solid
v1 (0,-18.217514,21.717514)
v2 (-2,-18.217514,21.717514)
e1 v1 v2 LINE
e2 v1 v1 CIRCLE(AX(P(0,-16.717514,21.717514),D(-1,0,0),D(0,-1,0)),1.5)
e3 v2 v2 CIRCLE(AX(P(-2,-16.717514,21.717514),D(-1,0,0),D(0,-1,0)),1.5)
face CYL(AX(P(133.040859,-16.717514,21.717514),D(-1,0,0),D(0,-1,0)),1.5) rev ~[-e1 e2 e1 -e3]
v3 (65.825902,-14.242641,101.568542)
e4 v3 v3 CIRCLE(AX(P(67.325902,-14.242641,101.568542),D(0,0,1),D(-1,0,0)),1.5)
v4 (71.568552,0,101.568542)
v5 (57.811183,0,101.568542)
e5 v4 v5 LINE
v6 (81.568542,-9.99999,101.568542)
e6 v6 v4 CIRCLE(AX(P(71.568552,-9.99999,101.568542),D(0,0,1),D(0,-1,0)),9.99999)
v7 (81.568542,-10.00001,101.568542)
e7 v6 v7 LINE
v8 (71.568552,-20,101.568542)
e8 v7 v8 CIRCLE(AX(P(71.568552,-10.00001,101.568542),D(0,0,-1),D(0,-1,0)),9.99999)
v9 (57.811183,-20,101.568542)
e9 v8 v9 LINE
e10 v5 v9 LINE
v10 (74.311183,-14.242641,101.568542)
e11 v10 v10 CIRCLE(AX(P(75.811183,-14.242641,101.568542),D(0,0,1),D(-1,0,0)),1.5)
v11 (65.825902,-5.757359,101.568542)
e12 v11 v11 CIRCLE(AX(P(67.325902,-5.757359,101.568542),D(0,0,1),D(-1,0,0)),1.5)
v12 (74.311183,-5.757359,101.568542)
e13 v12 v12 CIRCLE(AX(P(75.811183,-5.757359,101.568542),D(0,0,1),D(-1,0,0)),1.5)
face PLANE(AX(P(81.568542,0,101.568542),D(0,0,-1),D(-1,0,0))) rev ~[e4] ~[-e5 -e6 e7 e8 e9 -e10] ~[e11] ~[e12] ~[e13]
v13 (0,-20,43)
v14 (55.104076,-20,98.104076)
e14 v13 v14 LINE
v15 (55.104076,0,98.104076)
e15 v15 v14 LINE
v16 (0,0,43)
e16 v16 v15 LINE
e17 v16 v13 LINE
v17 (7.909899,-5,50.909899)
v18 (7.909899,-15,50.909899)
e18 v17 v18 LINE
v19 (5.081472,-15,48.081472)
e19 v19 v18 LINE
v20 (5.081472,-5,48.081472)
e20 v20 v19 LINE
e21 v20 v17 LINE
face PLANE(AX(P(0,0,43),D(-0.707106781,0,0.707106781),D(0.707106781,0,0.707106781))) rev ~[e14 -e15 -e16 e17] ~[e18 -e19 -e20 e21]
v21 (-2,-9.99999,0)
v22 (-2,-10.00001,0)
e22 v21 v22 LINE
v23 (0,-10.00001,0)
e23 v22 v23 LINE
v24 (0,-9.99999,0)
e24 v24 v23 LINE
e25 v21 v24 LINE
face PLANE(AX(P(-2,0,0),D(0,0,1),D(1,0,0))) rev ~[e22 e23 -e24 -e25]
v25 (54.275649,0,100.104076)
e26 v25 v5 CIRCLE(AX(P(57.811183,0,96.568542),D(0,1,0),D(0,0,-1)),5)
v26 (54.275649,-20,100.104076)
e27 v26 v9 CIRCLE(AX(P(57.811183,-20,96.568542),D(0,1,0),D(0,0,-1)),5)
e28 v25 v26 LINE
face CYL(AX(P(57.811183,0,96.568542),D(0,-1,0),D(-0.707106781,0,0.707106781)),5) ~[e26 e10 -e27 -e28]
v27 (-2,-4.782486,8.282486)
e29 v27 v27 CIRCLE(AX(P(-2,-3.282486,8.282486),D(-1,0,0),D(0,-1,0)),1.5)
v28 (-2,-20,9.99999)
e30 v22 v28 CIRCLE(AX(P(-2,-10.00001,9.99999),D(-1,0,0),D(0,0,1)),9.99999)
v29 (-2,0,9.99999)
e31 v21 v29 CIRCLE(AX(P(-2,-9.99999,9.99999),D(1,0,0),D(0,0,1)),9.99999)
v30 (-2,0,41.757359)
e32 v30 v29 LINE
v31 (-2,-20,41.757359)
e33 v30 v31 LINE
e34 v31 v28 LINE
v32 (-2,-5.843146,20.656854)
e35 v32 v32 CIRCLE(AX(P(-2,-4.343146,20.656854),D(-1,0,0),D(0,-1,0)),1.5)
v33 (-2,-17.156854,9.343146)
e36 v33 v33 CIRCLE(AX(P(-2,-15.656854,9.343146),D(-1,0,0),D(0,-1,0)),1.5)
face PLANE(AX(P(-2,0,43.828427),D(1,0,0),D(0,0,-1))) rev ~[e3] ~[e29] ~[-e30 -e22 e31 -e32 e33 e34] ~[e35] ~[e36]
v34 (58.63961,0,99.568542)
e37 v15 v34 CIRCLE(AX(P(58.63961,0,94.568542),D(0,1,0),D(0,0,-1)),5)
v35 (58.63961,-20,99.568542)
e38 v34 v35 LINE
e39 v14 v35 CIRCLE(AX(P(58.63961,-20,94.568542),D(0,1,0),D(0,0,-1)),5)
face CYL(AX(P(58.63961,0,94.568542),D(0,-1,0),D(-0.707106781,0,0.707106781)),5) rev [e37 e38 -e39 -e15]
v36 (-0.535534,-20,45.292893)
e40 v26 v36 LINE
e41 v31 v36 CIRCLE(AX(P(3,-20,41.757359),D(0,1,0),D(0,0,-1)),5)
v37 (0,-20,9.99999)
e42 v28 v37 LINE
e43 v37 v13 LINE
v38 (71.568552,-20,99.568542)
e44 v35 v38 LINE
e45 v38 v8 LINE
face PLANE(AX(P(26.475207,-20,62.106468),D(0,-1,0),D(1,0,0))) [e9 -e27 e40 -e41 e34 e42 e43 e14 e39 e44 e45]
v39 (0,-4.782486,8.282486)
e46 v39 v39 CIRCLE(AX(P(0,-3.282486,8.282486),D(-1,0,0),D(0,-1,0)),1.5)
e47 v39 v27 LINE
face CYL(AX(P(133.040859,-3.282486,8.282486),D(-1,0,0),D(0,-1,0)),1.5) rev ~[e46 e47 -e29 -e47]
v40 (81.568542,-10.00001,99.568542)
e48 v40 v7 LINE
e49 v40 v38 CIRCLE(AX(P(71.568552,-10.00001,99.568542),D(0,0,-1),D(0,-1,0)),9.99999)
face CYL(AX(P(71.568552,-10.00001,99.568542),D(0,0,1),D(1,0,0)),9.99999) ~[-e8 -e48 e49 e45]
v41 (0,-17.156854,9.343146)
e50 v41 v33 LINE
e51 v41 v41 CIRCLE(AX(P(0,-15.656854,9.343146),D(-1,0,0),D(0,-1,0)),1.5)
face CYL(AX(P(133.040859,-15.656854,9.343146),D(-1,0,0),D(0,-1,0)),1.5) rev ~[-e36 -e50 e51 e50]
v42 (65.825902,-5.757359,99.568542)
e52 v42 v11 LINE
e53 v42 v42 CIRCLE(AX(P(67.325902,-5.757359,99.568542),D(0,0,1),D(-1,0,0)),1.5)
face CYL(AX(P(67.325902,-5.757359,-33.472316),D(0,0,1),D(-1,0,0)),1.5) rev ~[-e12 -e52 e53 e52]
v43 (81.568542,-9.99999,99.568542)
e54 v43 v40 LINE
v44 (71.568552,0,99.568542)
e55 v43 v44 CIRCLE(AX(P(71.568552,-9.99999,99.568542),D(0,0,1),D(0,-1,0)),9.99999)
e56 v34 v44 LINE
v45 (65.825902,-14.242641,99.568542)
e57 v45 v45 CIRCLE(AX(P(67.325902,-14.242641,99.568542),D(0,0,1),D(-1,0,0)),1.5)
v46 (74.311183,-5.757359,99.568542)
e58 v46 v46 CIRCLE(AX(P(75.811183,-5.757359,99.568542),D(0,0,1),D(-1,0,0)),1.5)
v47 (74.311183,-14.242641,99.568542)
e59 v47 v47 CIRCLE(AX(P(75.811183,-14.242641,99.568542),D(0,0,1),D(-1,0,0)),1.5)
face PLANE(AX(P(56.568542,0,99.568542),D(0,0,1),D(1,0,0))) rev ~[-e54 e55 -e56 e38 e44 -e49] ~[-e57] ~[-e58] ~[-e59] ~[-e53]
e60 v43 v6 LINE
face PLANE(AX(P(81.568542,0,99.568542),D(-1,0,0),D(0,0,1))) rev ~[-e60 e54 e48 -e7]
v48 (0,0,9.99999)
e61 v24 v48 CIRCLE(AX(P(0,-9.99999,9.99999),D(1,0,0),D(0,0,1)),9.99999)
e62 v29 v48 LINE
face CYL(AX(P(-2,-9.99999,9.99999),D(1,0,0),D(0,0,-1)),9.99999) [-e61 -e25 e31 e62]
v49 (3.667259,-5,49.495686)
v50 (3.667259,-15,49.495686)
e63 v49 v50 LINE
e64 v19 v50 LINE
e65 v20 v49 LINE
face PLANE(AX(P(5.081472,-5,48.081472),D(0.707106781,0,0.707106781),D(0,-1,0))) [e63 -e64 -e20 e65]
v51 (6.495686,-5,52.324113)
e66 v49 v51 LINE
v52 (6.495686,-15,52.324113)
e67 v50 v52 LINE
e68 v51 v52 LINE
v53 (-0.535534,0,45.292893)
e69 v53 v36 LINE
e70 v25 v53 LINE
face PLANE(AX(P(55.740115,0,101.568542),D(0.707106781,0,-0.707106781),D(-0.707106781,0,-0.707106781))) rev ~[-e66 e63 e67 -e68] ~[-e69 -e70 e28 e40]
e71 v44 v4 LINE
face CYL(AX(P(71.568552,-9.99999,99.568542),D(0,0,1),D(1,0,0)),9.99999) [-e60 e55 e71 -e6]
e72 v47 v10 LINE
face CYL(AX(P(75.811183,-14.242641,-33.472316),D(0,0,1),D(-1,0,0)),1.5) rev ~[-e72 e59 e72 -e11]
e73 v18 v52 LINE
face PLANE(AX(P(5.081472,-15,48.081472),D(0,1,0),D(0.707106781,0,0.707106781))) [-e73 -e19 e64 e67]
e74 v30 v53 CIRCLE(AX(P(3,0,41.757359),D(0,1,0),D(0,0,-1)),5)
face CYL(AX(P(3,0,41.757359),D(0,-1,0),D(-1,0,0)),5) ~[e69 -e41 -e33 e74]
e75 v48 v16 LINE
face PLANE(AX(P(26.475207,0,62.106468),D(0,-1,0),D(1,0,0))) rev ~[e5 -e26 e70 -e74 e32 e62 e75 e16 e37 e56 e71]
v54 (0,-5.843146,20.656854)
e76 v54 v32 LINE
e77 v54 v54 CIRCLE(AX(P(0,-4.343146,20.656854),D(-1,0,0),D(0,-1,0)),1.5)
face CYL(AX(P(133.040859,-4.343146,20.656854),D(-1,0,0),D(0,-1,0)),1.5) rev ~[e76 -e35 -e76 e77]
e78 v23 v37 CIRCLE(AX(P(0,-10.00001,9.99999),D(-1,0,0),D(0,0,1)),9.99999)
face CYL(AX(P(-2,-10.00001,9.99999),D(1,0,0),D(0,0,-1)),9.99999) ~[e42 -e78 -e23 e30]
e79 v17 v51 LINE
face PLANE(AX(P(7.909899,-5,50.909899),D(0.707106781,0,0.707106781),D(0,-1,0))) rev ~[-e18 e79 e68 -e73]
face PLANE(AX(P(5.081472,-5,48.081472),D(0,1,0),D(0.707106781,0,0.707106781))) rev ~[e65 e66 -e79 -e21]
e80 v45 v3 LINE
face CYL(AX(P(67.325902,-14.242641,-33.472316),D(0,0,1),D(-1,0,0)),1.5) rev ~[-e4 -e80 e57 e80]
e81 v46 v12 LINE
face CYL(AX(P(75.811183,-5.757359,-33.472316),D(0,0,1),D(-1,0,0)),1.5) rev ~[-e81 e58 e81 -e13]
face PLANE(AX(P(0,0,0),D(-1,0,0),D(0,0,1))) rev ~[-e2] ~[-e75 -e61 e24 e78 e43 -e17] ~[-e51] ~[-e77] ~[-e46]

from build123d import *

# Parameters (mm, degrees)
F1_DEPTH = 20
F3_R     = 9.99999
F4_D     = 3
F5_R     = 5
F7_D     = 3
F8_W     = 4
F8_H     = 10
F9_DEPTH = 25


# Not quite as in the source:
# - a fillet or chamfer is up to 0.001 mm smaller than in the source, because OpenCascade refuses the exact size


with BuildPart() as f1:
    # F0 (on Front) → F1 (new body)
    with BuildSketch(Plane.XZ):
        Polygon((-2, 0), (0, 0), (0, 43), (56.5685424949, 99.5685424949), (81.5685424949, 99.5685424949), (81.5685424949, 101.5685424949), (55.7401153702, 101.5685424949), (-2, 43.8284271247), align=None)
    extrude(amount=F1_DEPTH)

    # F3 (radius 10 in the source; OpenCascade refuses exactly that, so slightly less here)
    f3_edges = [f1.edges().sort_by_distance(p)[0] for p in [
        (-1, -20, 0),
        (-1, 0, 0),
        (81.568542, 0, 100.568542),
        (81.568542, -20, 100.568542),
    ]]
    fillet(f3_edges, radius=F3_R)

    # F4 (through all)
    with Locations(Plane(origin=(0, 0, 99.5685424949), x_dir=(1, 0, 0), z_dir=(0, 0, -1))):
        with Locations((75.811183182, 14.2426406871), (67.3259018078, 14.2426406871), (67.3259018078, 5.7573593129), (75.811183182, 5.7573593129)):
            Hole(F4_D / 2)

    # F5
    f5_edges = [f1.edges().sort_by_distance(p)[0] for p in [
        (55.740115, -10, 101.568542),
        (56.568542, -10, 99.568542),
        (-2, -10, 43.828427),
    ]]
    fillet(f5_edges, radius=F5_R)

    # F7 (through all)
    with Locations(Plane.YZ):
        with Locations((-4.3431457505, 20.6568542495), (-16.7175144213, 21.7175144213), (-15.6568542495, 9.3431457505), (-3.2824855787, 8.2824855787)):
            Hole(F7_D / 2)

    # F8 (on face) → F9 (cut)
    with BuildSketch(Plane(origin=(-21.5, 0, 21.5), x_dir=(0.7071067812, 0, 0.7071067812), z_dir=(0.7071067812, 0, -0.7071067812))):
        with Locations((39.5918783247, 10)):
            Rectangle(F8_W, F8_H)
    extrude(amount=-F9_DEPTH, mode=Mode.SUBTRACT)


solid = f1.part
